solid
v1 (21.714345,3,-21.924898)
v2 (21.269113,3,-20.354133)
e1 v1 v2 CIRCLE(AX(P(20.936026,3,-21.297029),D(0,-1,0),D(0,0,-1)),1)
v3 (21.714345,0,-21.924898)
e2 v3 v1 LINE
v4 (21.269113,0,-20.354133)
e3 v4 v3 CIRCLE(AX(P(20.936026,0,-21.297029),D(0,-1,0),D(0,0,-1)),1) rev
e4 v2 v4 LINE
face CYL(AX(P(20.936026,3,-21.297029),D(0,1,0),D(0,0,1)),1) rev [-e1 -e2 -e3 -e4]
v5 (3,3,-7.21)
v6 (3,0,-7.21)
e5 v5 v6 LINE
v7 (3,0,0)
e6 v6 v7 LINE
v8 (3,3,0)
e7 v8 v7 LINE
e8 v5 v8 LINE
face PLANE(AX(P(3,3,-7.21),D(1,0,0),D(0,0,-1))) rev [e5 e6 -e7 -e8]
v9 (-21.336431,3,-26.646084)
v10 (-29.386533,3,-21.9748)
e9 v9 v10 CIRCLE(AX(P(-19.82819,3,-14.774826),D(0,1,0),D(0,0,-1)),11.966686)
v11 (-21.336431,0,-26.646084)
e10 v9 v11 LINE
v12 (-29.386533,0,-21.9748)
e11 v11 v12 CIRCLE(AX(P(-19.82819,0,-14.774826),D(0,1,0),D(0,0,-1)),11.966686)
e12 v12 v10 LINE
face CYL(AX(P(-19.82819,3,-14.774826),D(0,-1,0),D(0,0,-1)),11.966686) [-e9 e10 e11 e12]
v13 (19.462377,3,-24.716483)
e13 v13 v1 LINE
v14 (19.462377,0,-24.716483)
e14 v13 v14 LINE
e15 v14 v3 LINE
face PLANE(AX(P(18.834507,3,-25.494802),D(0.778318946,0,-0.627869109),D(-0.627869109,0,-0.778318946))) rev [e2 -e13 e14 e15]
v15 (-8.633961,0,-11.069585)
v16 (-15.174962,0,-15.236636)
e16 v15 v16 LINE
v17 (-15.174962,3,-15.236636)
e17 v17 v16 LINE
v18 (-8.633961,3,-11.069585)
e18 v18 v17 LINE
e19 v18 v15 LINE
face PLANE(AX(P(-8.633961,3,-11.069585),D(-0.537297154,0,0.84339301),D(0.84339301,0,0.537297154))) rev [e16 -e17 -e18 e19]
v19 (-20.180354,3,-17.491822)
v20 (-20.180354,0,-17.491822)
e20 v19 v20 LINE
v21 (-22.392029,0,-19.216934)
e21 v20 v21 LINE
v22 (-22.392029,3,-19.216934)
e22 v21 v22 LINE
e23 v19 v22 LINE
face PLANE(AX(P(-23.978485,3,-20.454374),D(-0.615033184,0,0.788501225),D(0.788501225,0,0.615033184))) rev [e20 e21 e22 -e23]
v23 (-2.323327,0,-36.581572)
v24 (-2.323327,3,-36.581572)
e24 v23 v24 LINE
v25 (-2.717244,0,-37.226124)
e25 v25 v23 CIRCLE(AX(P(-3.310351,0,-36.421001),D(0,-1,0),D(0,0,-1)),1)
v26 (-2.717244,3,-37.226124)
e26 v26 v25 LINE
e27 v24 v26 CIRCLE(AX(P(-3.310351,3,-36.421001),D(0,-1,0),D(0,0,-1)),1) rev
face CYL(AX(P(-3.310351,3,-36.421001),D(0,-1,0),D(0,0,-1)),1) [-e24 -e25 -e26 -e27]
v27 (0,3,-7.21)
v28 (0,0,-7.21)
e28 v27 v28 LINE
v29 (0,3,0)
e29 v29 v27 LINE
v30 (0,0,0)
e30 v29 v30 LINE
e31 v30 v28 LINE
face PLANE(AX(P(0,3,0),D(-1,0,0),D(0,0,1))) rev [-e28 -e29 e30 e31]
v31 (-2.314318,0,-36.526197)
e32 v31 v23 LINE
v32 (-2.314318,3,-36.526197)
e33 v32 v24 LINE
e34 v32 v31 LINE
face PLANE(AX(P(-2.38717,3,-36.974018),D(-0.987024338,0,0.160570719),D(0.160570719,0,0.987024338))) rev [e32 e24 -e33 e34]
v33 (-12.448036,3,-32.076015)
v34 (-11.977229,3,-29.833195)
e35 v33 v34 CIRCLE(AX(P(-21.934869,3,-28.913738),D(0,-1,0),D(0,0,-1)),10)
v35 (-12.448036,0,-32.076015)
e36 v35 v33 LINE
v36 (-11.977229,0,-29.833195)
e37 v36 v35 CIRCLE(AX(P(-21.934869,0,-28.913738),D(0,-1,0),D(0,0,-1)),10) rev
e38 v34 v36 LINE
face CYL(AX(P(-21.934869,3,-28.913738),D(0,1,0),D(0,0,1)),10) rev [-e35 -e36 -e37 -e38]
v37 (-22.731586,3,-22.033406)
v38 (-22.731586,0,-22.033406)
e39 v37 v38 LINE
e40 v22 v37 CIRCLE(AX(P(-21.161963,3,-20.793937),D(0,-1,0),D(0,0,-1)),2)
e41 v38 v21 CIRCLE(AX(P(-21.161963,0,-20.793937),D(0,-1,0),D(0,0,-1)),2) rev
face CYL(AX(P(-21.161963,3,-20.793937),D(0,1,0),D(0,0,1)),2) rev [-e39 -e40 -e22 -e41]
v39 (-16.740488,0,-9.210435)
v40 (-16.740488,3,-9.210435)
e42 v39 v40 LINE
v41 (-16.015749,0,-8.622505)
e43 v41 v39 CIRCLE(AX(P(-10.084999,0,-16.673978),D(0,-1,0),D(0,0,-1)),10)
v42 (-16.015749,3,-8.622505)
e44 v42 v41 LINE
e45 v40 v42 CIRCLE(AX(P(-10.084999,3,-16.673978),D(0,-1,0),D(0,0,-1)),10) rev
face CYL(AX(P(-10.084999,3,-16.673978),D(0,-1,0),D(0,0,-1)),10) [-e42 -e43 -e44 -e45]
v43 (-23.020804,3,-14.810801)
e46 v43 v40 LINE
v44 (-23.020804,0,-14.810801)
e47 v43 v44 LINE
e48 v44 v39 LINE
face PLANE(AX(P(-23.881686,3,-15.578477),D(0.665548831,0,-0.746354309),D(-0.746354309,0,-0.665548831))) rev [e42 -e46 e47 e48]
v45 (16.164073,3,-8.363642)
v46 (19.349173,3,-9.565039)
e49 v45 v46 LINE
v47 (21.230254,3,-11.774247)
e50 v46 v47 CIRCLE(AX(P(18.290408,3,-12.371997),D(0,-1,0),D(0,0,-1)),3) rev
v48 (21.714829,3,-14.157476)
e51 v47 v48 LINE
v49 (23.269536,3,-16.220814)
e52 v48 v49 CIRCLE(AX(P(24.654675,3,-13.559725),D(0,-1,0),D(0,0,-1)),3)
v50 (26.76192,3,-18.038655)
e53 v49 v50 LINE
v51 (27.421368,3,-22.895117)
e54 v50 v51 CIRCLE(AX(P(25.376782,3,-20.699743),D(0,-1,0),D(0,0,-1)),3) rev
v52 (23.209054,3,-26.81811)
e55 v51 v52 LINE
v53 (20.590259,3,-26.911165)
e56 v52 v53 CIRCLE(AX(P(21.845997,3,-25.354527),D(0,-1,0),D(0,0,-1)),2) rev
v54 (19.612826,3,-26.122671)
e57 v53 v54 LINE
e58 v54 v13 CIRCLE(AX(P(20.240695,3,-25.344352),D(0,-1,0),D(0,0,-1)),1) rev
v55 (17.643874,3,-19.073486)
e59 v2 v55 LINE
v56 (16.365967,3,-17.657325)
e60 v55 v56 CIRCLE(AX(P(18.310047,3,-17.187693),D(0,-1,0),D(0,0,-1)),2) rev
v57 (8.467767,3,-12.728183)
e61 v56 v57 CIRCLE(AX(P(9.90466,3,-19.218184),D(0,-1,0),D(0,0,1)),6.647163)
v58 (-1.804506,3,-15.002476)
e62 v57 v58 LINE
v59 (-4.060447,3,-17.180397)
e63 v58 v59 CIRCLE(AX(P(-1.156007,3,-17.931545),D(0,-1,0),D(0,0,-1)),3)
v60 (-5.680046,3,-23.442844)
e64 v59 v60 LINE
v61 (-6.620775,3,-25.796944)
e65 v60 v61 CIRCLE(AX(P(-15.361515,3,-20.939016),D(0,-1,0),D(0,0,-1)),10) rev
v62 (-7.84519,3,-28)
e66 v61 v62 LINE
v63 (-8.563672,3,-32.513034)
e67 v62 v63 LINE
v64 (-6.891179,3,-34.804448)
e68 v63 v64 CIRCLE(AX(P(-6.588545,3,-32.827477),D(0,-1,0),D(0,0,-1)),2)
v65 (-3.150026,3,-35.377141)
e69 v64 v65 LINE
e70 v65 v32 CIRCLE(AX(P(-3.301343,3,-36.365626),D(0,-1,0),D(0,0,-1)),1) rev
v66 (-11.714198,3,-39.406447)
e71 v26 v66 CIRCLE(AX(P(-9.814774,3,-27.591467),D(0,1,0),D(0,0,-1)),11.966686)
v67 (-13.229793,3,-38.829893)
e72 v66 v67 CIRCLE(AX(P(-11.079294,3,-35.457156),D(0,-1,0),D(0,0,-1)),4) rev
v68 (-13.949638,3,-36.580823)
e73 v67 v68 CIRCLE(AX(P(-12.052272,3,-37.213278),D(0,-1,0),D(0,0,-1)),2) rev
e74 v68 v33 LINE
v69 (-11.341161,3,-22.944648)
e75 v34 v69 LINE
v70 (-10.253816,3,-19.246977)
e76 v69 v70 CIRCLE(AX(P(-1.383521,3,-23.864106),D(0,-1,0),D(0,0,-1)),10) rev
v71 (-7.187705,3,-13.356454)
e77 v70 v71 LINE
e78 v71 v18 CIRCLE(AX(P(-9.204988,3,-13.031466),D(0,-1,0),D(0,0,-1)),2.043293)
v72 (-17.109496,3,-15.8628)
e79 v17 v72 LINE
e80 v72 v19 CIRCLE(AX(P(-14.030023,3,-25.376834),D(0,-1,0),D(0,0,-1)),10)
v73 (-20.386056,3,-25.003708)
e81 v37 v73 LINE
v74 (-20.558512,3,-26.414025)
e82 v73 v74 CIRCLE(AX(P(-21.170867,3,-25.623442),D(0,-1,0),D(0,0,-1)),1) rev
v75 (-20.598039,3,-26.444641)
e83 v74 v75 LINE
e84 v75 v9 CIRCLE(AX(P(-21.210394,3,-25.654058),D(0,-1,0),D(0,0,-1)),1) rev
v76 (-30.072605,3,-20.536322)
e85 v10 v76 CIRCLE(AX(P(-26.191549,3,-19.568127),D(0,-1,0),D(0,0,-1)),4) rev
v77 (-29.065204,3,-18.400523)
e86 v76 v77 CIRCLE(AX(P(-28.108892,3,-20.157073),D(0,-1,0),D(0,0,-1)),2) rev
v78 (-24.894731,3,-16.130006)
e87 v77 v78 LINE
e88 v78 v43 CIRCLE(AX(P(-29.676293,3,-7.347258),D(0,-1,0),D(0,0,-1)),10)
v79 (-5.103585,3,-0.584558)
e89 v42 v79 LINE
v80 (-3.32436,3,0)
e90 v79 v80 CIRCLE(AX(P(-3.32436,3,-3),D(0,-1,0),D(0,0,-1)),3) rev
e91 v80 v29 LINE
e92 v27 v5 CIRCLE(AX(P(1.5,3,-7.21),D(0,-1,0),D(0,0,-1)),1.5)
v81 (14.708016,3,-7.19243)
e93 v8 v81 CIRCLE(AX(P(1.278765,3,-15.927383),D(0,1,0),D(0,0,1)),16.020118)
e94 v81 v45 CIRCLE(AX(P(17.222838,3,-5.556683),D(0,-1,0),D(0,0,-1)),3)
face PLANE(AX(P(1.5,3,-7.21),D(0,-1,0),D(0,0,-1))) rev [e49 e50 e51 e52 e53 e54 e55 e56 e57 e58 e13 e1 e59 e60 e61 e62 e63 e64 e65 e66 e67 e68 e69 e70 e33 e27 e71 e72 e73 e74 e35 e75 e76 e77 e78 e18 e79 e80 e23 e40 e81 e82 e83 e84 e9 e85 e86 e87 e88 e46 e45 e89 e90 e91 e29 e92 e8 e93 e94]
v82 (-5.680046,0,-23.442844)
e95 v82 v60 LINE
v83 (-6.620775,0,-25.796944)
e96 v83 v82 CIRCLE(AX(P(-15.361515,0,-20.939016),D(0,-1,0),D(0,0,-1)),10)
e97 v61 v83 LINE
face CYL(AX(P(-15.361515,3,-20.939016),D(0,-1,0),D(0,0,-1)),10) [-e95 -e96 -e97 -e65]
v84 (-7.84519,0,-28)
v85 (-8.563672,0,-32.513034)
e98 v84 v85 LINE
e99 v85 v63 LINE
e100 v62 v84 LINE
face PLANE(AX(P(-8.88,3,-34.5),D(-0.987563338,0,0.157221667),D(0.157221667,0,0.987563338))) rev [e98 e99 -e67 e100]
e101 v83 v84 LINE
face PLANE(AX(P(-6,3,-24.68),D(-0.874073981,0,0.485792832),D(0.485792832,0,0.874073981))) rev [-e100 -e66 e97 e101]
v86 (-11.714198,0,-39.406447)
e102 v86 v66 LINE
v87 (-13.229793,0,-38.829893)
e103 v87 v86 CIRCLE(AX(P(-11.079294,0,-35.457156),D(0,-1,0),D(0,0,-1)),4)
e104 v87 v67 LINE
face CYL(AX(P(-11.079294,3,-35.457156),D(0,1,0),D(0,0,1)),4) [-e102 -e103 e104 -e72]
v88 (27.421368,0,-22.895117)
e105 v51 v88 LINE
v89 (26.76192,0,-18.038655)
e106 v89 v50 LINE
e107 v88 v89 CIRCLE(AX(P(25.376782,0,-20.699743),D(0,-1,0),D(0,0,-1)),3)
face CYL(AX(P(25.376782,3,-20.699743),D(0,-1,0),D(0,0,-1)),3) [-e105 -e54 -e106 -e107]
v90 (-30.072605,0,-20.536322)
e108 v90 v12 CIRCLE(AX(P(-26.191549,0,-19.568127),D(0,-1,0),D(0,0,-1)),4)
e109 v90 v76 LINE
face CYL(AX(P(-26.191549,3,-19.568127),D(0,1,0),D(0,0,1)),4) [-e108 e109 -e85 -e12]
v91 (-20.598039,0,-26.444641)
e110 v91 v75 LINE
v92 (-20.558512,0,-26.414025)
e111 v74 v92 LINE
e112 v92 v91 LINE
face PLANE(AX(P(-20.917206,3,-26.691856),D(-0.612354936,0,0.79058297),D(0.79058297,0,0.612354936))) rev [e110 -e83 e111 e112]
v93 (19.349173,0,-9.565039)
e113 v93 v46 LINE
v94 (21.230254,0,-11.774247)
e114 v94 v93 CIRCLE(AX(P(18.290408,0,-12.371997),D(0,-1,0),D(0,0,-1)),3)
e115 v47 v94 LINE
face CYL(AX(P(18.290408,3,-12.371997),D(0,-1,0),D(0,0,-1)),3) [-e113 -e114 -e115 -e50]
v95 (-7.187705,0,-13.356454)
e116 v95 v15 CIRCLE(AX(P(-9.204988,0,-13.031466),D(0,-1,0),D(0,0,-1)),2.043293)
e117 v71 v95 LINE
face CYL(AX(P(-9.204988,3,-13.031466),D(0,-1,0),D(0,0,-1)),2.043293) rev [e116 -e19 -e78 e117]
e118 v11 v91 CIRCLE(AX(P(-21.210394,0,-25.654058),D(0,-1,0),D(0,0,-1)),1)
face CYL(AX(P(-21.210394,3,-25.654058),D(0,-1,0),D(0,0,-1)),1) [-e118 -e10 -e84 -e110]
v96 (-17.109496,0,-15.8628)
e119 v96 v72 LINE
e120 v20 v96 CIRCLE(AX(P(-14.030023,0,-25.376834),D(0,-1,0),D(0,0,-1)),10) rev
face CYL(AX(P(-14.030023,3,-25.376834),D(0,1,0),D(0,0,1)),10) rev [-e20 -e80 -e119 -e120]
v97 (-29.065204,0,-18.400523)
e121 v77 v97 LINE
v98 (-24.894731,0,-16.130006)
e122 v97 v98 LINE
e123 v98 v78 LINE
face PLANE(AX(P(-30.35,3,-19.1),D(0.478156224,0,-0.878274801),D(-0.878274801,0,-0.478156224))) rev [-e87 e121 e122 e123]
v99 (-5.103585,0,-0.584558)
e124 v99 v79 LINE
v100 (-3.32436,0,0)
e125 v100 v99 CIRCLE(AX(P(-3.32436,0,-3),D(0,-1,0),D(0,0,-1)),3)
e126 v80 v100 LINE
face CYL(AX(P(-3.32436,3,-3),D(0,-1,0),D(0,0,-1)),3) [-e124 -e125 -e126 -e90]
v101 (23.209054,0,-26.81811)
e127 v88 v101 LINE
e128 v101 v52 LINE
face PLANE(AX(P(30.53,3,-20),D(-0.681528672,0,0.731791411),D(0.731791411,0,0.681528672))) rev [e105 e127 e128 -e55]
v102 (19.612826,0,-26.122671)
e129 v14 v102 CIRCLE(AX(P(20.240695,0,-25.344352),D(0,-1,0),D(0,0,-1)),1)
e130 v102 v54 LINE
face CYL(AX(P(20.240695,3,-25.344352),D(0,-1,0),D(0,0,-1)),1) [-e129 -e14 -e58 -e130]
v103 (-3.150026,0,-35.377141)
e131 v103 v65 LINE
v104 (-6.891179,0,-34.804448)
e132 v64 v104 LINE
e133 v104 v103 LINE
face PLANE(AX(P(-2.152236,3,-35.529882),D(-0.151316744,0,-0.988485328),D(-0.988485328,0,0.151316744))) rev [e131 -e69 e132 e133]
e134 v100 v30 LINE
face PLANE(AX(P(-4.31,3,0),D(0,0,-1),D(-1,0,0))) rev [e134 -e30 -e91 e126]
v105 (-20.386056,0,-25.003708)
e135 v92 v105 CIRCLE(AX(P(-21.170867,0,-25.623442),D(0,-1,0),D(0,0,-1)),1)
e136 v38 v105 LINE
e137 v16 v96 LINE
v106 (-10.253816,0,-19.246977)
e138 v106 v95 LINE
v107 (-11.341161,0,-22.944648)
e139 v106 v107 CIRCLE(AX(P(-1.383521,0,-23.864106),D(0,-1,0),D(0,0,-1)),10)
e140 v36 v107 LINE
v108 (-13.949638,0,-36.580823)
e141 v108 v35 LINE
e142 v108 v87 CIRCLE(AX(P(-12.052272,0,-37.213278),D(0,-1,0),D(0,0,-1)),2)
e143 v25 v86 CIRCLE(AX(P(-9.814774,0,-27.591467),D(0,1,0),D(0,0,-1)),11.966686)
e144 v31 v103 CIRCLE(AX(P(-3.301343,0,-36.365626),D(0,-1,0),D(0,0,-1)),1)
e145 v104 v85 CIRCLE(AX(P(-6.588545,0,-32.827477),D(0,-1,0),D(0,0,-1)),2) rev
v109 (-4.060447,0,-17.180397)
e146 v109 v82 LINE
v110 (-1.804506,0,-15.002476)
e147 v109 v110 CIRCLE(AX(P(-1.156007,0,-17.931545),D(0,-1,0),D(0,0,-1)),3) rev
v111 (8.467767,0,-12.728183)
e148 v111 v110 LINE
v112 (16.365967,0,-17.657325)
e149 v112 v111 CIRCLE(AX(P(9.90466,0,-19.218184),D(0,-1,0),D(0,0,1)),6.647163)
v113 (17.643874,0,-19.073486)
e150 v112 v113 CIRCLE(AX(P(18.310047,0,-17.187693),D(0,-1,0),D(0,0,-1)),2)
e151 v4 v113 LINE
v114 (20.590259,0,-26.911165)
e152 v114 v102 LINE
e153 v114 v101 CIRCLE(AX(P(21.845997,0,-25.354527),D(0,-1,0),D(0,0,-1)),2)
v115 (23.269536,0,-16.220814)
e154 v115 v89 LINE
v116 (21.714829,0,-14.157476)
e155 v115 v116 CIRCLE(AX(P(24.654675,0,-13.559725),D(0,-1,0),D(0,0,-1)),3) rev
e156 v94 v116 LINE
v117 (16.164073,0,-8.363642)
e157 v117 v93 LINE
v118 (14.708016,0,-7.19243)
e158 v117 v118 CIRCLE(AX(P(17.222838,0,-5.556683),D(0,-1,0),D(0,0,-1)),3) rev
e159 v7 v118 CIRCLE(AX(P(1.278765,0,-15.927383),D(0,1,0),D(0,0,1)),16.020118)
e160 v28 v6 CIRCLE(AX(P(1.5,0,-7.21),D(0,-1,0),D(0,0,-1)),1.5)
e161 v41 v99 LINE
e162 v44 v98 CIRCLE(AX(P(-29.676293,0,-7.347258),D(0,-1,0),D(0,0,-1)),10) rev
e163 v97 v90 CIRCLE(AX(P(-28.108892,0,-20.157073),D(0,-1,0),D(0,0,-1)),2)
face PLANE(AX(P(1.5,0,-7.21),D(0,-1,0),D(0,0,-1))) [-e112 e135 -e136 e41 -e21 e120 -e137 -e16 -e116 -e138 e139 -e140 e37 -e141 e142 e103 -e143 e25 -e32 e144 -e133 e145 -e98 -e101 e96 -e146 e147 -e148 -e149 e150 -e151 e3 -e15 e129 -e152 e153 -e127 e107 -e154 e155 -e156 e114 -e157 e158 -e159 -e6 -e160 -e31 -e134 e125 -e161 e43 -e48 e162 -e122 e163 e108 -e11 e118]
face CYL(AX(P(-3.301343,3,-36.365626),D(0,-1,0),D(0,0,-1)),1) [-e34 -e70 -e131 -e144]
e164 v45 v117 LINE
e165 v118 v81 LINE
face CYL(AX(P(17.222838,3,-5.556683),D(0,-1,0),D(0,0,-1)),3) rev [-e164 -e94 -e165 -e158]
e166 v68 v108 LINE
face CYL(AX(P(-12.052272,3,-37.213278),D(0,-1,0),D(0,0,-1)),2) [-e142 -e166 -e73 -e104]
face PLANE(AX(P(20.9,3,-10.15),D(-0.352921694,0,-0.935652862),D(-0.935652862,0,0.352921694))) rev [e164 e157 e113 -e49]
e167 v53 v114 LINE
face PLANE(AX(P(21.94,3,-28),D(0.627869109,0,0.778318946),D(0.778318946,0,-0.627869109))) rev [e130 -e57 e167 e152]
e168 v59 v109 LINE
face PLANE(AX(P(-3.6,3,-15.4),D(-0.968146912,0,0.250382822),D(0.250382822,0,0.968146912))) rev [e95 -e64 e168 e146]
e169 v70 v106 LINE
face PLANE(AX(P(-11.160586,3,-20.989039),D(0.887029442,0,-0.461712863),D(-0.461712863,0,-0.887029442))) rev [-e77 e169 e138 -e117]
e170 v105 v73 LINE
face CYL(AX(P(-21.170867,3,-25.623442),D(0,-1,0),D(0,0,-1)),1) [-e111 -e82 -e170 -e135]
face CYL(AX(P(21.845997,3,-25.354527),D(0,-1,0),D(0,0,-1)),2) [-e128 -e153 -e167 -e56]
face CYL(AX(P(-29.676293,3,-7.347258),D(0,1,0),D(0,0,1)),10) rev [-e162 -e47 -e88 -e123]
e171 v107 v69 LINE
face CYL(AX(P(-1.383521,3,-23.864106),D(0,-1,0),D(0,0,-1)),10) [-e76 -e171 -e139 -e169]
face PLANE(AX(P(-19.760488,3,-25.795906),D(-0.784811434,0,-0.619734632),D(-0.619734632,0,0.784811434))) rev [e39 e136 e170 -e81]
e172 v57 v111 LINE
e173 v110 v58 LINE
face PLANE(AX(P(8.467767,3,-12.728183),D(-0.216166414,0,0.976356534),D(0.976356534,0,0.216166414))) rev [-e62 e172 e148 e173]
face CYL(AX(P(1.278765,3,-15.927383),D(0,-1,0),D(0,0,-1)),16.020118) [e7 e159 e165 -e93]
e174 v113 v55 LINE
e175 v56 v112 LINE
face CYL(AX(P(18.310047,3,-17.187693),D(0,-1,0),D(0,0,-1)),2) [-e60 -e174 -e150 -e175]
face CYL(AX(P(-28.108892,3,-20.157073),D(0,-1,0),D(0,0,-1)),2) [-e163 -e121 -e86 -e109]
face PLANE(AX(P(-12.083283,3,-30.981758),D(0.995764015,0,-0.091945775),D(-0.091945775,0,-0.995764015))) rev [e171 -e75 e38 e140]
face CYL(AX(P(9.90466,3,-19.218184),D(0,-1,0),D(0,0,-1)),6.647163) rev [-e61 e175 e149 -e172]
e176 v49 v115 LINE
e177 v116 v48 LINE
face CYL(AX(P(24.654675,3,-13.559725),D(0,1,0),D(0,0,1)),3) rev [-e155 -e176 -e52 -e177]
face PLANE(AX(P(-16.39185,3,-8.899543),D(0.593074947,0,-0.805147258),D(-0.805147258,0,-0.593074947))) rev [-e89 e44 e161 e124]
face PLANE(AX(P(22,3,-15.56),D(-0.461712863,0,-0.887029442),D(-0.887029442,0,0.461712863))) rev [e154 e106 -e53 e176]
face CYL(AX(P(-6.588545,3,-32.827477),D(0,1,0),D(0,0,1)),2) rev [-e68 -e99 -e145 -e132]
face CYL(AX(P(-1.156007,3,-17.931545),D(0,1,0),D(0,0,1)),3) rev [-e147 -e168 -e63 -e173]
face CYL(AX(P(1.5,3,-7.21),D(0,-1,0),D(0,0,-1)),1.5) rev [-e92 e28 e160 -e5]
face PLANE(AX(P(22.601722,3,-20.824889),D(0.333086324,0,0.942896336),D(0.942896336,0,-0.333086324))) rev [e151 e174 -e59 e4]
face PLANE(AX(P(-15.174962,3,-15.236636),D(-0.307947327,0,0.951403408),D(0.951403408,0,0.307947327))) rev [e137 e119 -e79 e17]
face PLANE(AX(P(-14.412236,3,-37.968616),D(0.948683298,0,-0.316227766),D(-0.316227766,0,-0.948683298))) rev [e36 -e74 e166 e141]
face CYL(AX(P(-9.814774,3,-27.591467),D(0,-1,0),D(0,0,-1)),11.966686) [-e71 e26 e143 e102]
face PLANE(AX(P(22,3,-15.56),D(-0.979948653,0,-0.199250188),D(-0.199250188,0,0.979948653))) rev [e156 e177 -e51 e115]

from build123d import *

# Parameters (mm, degrees)
BOSS_EXTRUDE1_DEPTH = 3
FILLET1_R           = 10
FILLET2_R           = 2
FILLET3_R           = 4
FILLET4_R           = 1
FILLET5_R           = 2
FILLET6_R           = 3
FILLET7_R           = 2
FILLET8_R           = 1


with BuildPart() as part:
    # Sketch1 → Boss-Extrude1 (new body)
    with BuildSketch(Plane(origin=(0, 0, 0), x_dir=(1, 0, 0), z_dir=(0, 1, 0))):
        with BuildLine():
            Line((0, 0), (0, 7.21))
            ThreePointArc((0, 7.21), (1.5, 8.71), (3, 7.21))
            Line((3, 7.21), (3, 0))
            ThreePointArc((3, 0), (10.063508451, 2.530649612), (15.2, 8))
            Line((15.2, 8), (20.9, 10.15))
            Line((20.9, 10.15), (22, 15.56))
            Line((22, 15.56), (30.53, 20))
            Line((30.53, 20), (21.94, 28))
            Line((21.94, 28), (18.834507406, 25.494802254))
            Line((18.834507406, 25.494802254), (22.601722061, 20.824888578))
            Line((22.601722061, 20.824888578), (16.53, 18.68))
            ThreePointArc((16.53, 18.68), (13.852574152, 13.870404311), (8.467766761, 12.728183128))
            Line((8.467766761, 12.728183128), (-3.6, 15.4))
            Line((-3.6, 15.4), (-6, 24.68))
            Line((-6, 24.68), (-7.84518958, 28))
            Line((-7.84518958, 28), (-8.88, 34.5))
            Line((-8.88, 34.5), (-2.152236064, 35.529882091))
            Line((-2.152236064, 35.529882091), (-2.387170471, 36.974018228))
            ThreePointArc((-2.387170471, 36.974018228), (-7.295622624, 39.289989721), (-12.7222653, 39.199569746))
            Line((-12.7222653, 39.199569746), (-14.412236064, 37.968616292))
            Line((-14.412236064, 37.968616292), (-12.083283256, 30.98175787))
            Line((-12.083283256, 30.98175787), (-11.160586433, 20.989038892))
            Line((-11.160586433, 20.989038892), (-7.18770511, 13.356453829))
            ThreePointArc((-7.18770511, 13.356453829), (-7.478060289, 11.939326713), (-8.633960614, 11.06958547))
            Line((-8.633960614, 11.06958547), (-15.174962181, 15.236636279))
            Line((-15.174962181, 15.236636279), (-18.788682966, 16.406314301))
            Line((-18.788682966, 16.406314301), (-23.978484738, 20.454374352))
            Line((-23.978484738, 20.454374352), (-19.760487577, 25.795906403))
            Line((-19.760487577, 25.795906403), (-20.917206202, 26.691855832))
            ThreePointArc((-20.917206202, 26.691855832), (-26.082048226, 24.977316424), (-29.953541863, 21.152819654))
            Line((-29.953541863, 21.152819654), (-30.35, 19.1))
            Line((-30.35, 19.1), (-23.881685757, 15.578477225))
            Line((-23.881685757, 15.578477225), (-16.391850065, 8.899542932))
            Line((-16.391850065, 8.899542932), (-4.31, 0))
            Line((-4.31, 0), (0, 0))
        make_face()
    extrude(amount=BOSS_EXTRUDE1_DEPTH)

    # Fillet1
    # the kernel refuses this fillet: 10 mm, written as the material it adds along each edge
    with BuildSketch(Plane(origin=(-23.881685757, 0, -15.578477225), x_dir=(0.7463543086555258, 0, 0.6655488306287767), z_dir=(0, 1, 0))) as fillet1_piece_1:
        with BuildLine():
            CenterArc((FILLET1_R * 0.115344853594, -FILLET1_R), FILLET1_R, 90, 13.159392789)
            Line((-FILLET1_R * 0.112315955105, -FILLET1_R * 0.0262595026484), (0, 0))
            Line((0, 0), (FILLET1_R * 0.115344853594, 0))
        make_face()
    extrude(amount=3)
    with BuildSketch(Plane(origin=(-18.788682966, 0, -16.406314301), x_dir=(0.9514034075145552, 0, 0.3079473269403278), z_dir=(0, 1, 0))) as fillet1_piece_2:
        with BuildLine():
            CenterArc((FILLET1_R * 0.176495798458, FILLET1_R), FILLET1_R, 249.981238779, 20.018761221)
            Line((-FILLET1_R * 0.165832024258, FILLET1_R * 0.0604194224044), (0, 0))
            Line((0, 0), (FILLET1_R * 0.176495798458, 0))
        make_face()
    extrude(amount=3)
    with BuildSketch(Plane(origin=(-12.083283256, 0, -30.98175787), x_dir=(-0.3162277660168379, 0, -0.9486832980505138), z_dir=(0, 1, 0))) as fillet1_piece_3:
        with BuildLine():
            CenterArc((FILLET1_R * 0.115344853594, FILLET1_R), FILLET1_R, 256.840607211, 13.159392789)
            Line((-FILLET1_R * 0.112315955105, FILLET1_R * 0.0262595026484), (0, 0))
            Line((0, 0), (FILLET1_R * 0.115344853594, 0))
        make_face()
    extrude(amount=3)
    # the kernel refuses this fillet: 10 mm, written as the material it takes off along each edge
    with BuildSketch(Plane(origin=(-16.391850065, -1.167802292, -8.899542932), x_dir=(-0.7463543086555279, 0, -0.6655488306287745), z_dir=(0, 1, 0))) as fillet1_2_piece_1:
        with BuildLine():
            CenterArc((FILLET1_R * 0.0467120916838, -FILLET1_R), FILLET1_R, 90, 5.348923188)
            Line((-FILLET1_R * 0.0465086821366, -FILLET1_R * 0.00435453733353), (0, 0))
            Line((0, 0), (FILLET1_R * 0.0467120916838, 0))
        make_face()
    extrude(amount=5.335604584, mode=Mode.SUBTRACT)
    with BuildSketch(Plane(origin=(-11.160586433, -4.90982012, -20.989038892), x_dir=(-0.09194577532432974, 0, -0.9957640154173116), z_dir=(0, 1, 0))) as fillet1_2_piece_2:
        with BuildLine():
            CenterArc((FILLET1_R * 0.196392804796, -FILLET1_R), FILLET1_R, 90, 22.222134755)
            Line((-FILLET1_R * 0.18180564018, -FILLET1_R * 0.0742754533783), (0, 0))
            Line((0, 0), (FILLET1_R * 0.196392804796, 0))
        make_face()
    extrude(amount=12.81964024, mode=Mode.SUBTRACT)
    with BuildSketch(Plane(origin=(-6, -3.194649605, -24.68), x_dir=(0.2503828219685178, 0, 0.9681469116116013), z_dir=(0, 1, 0))) as fillet1_2_piece_3:
        with BuildLine():
            CenterArc((FILLET1_R * 0.127785984198, -FILLET1_R), FILLET1_R, 90, 14.564262893)
            Line((-FILLET1_R * 0.123679735642, -FILLET1_R * 0.0321337945019), (0, 0))
            Line((0, 0), (FILLET1_R * 0.127785984198, 0))
        make_face()
    extrude(amount=9.38929921, mode=Mode.SUBTRACT)

    # Fillet2
    fillet2_edges = [part.edges().sort_by_distance(p)[0] for p in [
        (-30.35, 1.5, -19.1),
        (-14.412236064, 1.5, -37.968616292),
    ]]
    fillet(fillet2_edges, radius=FILLET2_R)

    # Fillet3
    # the kernel refuses this fillet: 4 mm, written as the material it takes off along each edge
    with BuildSketch(Plane(origin=(-12.7222653, -2.572689519, -39.199569746), x_dir=(-0.8083072770831305, 0, 0.5887608562179175), z_dir=(0, 1, 0))) as fillet3_piece_1:
        with BuildLine():
            CenterArc((0.875361271, 3.992337402), FILLET3_R, 243.063834504, 23.389134387)
            ThreePointArc((-0.936628841, 0.426290314), (-0.472898898, 0.203072318), (0, 0))
            Line((0, 0), (0.627889929, 0))
        make_face()
    extrude(amount=8.145379038, mode=Mode.SUBTRACT)
    with BuildSketch(Plane(origin=(-29.953541863, -2.496436383, -21.152819654), x_dir=(-0.18962458073088623, 0, 0.9818566689607173), z_dir=(0, 1, 0))) as fillet3_piece_2:
        with BuildLine():
            CenterArc((0.842574318, 3.994234672), FILLET3_R, 243.941405888, 22.981988472)
            ThreePointArc((-0.914585995, 0.400853585), (-0.461476033, 0.190882795), (0, 0))
            Line((0, 0), (0.627889929, 0))
        make_face()
    extrude(amount=7.992872766, mode=Mode.SUBTRACT)

    # Fillet4
    fillet4_edges = [part.edges().sort_by_distance(p)[0] for p in [
        (-20.917206202, 1.5, -26.691855832),
        (-19.760487577, 1.5, -25.795906403),
        (-2.387170471, 1.5, -36.974018228),
        (-2.152236064, 1.5, -35.529882091),
    ]]
    fillet(fillet4_edges, radius=FILLET4_R)

    # Fillet5
    fillet5_edges = [part.edges().sort_by_distance(p)[0] for p in [
        (-23.978484738, 1.5, -20.454374352),
        (-8.88, 1.5, -34.5),
    ]]
    fillet(fillet5_edges, radius=FILLET5_R)

    # Fillet6
    fillet6_edges = [part.edges().sort_by_distance(p)[0] for p in [
        (-4.31, 1.5, 0),
        (-3.6, 1.5, -15.4),
        (30.53, 1.5, -20),
        (22, 1.5, -15.56),
        (20.9, 1.5, -10.15),
        (15.2, 1.5, -8),
    ]]
    fillet(fillet6_edges, radius=FILLET6_R)

    # Fillet7
    fillet7_edges = [part.edges().sort_by_distance(p)[0] for p in [
        (16.53, 1.5, -18.68),
        (21.94, 1.5, -28),
    ]]
    fillet(fillet7_edges, radius=FILLET7_R)

    # Fillet8
    fillet8_edges = [part.edges().sort_by_distance(p)[0] for p in [
        (22.601722061, 1.5, -20.824888578),
        (18.834507406, 1.5, -25.494802254),
    ]]
    fillet(fillet8_edges, radius=FILLET8_R)


solid = part.part
